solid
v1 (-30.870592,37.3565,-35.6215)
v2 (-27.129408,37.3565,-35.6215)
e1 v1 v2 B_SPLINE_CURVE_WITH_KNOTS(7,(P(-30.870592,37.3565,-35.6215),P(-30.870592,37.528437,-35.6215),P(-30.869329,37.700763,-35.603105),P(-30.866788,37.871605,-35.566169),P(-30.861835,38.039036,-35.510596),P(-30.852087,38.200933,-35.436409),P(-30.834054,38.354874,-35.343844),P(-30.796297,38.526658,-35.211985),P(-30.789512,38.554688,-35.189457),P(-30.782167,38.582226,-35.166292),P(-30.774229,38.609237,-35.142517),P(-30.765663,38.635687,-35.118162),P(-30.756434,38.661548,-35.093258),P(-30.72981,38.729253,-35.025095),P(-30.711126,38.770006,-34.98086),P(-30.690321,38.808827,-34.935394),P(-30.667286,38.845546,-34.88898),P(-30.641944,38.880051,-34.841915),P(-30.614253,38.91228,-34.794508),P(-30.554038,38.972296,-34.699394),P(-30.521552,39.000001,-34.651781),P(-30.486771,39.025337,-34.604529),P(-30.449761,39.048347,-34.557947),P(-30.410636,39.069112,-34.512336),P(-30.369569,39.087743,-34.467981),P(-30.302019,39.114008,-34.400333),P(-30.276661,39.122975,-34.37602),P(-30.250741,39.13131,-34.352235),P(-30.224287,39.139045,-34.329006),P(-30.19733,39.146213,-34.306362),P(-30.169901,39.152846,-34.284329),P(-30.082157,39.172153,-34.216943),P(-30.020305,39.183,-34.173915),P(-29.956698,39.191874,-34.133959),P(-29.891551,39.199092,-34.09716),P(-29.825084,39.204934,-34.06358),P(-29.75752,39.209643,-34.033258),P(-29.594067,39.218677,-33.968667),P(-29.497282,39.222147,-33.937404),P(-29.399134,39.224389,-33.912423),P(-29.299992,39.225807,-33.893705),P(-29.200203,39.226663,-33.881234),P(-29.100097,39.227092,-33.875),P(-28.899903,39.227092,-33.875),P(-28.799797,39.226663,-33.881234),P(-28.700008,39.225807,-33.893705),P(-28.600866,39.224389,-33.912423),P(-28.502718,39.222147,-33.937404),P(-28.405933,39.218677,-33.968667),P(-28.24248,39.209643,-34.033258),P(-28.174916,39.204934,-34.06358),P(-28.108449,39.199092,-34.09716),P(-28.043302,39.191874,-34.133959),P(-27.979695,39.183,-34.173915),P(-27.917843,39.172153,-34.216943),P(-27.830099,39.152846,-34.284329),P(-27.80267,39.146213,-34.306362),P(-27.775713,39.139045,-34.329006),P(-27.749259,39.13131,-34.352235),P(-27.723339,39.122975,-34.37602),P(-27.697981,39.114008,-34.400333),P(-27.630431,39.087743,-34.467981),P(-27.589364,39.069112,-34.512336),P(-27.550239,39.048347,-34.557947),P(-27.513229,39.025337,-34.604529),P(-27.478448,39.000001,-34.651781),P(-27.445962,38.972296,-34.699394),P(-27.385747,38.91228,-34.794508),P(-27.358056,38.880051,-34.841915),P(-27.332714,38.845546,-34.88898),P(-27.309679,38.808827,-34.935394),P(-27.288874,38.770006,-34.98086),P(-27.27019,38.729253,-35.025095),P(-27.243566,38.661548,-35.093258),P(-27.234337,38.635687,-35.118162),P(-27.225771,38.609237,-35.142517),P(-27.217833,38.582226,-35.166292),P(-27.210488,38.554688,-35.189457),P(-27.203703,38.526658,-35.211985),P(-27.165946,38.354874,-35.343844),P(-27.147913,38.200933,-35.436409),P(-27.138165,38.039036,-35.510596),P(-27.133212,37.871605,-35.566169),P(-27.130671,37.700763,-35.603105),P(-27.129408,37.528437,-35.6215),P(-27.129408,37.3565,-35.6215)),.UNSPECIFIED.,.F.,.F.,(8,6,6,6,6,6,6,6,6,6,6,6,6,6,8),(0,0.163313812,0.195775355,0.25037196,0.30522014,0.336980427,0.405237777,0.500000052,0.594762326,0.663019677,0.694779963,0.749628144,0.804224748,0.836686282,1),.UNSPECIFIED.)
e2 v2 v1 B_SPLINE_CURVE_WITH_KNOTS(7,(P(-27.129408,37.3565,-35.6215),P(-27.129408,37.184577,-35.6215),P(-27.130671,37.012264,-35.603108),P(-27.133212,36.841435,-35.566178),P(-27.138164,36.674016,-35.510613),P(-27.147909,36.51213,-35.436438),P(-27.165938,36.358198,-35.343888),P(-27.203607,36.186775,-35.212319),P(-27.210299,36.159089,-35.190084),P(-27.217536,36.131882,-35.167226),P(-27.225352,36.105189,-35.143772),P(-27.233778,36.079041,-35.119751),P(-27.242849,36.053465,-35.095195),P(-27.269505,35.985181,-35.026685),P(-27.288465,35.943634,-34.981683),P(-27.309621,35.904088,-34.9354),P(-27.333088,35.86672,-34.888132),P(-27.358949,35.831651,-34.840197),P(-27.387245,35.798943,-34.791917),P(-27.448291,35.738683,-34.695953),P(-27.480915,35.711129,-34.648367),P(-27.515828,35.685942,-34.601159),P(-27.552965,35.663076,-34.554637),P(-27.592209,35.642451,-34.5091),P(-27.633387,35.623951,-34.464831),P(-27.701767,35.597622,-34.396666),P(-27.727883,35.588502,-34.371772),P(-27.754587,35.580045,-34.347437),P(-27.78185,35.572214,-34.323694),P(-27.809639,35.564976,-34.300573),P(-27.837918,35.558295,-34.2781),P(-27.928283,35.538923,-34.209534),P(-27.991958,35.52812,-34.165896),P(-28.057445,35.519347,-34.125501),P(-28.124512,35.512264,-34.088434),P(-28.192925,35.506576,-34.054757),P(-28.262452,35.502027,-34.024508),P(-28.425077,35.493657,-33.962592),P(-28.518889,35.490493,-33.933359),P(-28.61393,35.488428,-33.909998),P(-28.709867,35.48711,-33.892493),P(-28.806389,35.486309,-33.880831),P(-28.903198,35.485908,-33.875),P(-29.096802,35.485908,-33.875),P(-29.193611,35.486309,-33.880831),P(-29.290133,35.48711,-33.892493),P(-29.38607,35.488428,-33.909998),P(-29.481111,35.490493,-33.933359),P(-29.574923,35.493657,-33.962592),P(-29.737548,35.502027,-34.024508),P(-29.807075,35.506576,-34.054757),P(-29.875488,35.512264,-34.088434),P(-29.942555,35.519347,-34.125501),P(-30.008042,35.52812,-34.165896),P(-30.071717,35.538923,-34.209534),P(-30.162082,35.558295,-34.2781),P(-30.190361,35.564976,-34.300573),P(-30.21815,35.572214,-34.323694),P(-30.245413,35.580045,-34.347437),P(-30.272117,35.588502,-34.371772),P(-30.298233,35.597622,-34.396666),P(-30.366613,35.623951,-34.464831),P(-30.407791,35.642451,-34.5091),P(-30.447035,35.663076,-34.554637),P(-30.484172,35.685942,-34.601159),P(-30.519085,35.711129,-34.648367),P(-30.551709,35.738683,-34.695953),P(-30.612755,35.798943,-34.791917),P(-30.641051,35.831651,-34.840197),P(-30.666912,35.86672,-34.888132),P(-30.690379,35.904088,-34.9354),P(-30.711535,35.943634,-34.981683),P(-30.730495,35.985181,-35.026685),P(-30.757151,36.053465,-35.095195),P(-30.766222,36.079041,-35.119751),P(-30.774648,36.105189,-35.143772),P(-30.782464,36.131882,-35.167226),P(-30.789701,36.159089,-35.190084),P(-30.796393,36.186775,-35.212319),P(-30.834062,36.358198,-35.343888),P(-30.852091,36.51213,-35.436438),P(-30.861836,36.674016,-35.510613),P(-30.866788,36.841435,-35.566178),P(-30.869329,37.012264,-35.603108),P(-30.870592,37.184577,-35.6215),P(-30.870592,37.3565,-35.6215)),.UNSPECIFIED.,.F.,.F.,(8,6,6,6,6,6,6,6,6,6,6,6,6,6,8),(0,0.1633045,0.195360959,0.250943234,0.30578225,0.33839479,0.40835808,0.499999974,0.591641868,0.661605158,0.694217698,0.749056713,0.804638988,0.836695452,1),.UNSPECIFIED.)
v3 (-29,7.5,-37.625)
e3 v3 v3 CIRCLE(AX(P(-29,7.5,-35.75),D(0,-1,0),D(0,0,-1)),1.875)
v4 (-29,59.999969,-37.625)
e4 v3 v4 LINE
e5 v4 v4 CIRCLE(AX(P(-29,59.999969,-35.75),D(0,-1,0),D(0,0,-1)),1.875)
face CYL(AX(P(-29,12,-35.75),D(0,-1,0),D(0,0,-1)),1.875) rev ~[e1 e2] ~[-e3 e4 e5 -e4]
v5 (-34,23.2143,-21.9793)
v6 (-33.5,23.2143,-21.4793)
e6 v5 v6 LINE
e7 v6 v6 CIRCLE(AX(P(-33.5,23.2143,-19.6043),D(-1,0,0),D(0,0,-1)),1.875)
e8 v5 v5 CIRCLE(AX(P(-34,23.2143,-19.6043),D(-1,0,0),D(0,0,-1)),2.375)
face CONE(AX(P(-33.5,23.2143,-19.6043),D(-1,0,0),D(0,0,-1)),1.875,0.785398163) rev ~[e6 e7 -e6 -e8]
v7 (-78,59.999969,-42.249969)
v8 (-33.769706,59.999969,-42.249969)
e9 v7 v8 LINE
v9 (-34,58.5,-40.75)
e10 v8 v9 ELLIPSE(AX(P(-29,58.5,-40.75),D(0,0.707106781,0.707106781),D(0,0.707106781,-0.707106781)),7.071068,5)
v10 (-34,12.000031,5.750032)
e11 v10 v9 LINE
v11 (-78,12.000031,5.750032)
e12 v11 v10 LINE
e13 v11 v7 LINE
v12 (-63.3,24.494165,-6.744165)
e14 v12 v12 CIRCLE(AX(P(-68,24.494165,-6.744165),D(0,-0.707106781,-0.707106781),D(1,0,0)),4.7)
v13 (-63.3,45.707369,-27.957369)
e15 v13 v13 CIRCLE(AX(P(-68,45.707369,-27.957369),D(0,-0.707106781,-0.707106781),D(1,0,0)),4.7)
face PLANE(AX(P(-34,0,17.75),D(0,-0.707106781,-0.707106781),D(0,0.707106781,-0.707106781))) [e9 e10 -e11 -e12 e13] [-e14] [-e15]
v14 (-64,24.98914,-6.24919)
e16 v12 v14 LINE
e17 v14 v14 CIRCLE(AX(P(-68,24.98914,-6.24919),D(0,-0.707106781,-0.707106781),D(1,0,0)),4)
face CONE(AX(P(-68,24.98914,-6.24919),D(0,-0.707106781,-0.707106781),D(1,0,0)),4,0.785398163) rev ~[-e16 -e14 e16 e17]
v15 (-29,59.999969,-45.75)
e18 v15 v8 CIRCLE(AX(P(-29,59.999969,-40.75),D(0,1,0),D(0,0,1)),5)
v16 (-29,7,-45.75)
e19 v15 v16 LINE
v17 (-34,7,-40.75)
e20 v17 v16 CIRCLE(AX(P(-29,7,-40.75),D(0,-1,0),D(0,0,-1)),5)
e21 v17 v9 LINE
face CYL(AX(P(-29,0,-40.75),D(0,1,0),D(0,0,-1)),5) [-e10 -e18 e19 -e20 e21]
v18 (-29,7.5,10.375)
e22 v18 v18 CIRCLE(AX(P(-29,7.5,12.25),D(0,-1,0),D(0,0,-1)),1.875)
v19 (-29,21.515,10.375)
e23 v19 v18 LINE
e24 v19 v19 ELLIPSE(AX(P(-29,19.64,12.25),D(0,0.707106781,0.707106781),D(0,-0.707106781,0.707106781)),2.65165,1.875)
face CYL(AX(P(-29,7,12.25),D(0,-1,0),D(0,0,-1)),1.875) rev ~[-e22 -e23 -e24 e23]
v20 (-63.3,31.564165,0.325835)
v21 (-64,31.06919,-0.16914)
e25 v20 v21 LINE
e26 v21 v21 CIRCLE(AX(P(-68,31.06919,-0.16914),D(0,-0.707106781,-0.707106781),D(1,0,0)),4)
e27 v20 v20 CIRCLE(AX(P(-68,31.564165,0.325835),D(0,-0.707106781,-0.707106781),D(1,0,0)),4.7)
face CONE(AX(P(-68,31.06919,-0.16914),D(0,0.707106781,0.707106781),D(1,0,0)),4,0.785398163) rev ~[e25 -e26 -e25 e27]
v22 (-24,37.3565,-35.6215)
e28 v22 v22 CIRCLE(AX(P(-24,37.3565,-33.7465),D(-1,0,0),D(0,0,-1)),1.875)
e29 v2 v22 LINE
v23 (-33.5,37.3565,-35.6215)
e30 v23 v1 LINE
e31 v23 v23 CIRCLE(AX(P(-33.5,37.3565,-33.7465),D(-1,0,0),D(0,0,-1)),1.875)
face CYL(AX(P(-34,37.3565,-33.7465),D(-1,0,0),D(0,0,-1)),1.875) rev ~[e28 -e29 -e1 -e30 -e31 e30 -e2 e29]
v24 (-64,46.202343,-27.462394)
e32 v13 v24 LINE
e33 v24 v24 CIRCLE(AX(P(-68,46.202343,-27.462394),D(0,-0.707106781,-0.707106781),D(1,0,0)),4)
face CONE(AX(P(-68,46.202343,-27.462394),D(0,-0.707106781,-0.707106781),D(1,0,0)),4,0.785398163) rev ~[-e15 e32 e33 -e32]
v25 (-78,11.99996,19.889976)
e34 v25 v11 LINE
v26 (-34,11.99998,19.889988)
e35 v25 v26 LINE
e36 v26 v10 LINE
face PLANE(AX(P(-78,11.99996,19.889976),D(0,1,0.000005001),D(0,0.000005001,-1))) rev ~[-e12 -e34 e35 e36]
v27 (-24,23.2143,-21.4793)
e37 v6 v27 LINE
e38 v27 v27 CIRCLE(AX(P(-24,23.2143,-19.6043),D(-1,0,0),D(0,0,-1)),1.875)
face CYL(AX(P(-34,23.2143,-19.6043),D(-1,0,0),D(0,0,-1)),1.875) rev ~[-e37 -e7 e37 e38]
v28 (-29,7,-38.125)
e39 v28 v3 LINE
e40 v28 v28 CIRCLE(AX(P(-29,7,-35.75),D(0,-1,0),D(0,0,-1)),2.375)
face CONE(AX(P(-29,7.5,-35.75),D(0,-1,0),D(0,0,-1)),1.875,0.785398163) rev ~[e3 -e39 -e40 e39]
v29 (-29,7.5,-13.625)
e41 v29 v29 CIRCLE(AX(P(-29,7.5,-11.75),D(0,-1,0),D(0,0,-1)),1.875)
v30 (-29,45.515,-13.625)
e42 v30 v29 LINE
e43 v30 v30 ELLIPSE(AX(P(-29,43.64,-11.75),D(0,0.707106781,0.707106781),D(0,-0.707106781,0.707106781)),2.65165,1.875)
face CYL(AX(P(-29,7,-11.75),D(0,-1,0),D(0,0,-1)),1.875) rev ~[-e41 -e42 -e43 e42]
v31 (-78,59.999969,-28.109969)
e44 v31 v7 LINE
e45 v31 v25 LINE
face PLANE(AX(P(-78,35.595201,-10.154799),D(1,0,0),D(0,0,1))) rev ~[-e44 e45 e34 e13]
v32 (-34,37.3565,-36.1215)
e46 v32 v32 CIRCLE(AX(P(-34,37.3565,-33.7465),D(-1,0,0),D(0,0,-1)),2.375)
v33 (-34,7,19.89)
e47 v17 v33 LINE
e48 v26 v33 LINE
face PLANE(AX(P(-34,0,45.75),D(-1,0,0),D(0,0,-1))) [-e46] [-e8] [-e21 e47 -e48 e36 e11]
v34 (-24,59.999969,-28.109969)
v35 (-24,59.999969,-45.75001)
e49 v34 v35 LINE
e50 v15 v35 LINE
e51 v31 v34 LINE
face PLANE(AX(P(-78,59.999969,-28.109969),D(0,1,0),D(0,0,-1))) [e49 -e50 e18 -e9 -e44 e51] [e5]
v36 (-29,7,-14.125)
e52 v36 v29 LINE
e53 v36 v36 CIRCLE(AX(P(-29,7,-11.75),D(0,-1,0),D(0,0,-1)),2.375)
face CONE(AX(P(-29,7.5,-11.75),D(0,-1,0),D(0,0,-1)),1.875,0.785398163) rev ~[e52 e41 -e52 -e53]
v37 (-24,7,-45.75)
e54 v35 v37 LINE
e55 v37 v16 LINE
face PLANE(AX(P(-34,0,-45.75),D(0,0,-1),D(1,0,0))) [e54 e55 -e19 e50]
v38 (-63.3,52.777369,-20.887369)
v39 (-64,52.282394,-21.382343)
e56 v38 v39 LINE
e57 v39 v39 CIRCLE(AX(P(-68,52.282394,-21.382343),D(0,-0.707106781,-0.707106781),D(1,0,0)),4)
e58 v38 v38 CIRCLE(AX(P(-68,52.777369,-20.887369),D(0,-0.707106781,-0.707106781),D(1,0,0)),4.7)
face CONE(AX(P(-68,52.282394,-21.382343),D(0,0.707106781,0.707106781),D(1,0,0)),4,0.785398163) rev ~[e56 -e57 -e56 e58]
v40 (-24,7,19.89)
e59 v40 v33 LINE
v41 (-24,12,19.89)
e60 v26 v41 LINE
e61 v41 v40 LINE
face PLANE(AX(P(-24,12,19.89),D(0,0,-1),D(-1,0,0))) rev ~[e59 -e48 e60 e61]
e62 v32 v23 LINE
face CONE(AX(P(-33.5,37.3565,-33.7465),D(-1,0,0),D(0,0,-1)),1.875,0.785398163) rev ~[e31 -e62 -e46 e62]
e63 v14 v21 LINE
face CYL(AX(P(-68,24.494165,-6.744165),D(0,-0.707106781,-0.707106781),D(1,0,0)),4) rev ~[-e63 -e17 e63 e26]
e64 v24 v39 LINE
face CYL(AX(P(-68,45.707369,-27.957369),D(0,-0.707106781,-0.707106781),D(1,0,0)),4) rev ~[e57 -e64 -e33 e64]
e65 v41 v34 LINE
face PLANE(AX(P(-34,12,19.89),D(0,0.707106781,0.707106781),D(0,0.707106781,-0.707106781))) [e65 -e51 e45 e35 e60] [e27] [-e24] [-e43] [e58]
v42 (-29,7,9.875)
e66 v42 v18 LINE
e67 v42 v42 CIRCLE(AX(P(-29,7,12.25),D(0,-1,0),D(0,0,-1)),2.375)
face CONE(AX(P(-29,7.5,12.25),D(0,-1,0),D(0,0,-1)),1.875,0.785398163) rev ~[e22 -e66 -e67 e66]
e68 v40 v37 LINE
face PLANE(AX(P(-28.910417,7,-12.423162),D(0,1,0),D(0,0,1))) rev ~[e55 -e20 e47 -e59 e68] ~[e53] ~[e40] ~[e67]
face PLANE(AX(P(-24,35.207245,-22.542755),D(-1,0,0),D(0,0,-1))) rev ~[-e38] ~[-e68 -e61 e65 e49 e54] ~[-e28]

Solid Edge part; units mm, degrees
sketch "Sketch1" plane through (0, 0, 0) normal (0, -1, 0) x (1, 0, 0)
  line L0 (-34, -45.75) -> (34, -45.75)
  line L1 (34, -45.75) -> (34, 45.75)
  line L2 (34, 45.75) -> (-34, 45.75)
  line L3 (-34, 45.75) -> (-34, -45.75)
  dimension "D1" = 68
  dimension "D2" = 91.5
extrude "Protrusion1" add sketch "Sketch1" against normal blind 12
sketch "Sketch2" plane through (0, 0, 0) normal (0, -1, 0) x (1, 0, 0)
  circle A0 centre (0, -14.75) radius 11.25
  circle A1 centre (-15.5, 0.75) radius 1.7
  circle A2 centre (-15.5, -30.25) radius 1.7
  circle A3 centre (15.5, -30.25) radius 1.7
  circle A4 centre (15.5, 0.75) radius 1.7
  dimension "D1" = 22.5
  dimension "D2" = 3.4
  dimension "D3" = 31
  dimension "D4" = 31
extrude "Cutout1" cut sketch "Sketch2" against normal through all
sketch "Sketch3" plane through (0, 0, 0) normal (0, -1, 0) x (1, 0, 0)
  circle A0 centre (7.7782, 36.0282) radius 1.4
  circle A1 centre (7.7782, 20.4718) radius 1.4
  circle A2 centre (-7.7782, 20.4718) radius 1.4
  circle A3 centre (-7.7782, 36.0282) radius 1.4
  circle A4 centre (0, 28.25) radius 6
  dimension "D1" = 7.7782
extrude "Cutout2" cut sketch "Sketch3" against normal through all
sketch "Sketch4" plane through (-34, 6, 0) normal (-1, 0, 0) x (0, 0, -1)
  line L0 (-19.89, -6) -> (45.75, -71.64)
  line L1 (45.75, -71.64) -> (45.75, -6)
  line L2 (45.75, -6) -> (-19.89, -6)
  dimension "D1" = 25.86
extrude "Extrusionsausprägung_2" add sketch "Sketch4" against normal blind 10
sketch "Sketch5" plane through (-34, 38.82, 0) normal (-1, 0, 0) x (0, 0, -1)
  circle A0 centre (33.7465, 1.4635) radius 1.875
  circle A1 centre (19.6043, 15.6057) radius 1.875
  dimension "D1" = 3.75
  dimension "D2" = 20
  dimension "D3" = 42.14
  dimension "D4" = 32.83
extrude "Extrusionsausschnitt_3" cut sketch "Sketch5" against normal blind 14
sketch "Sketch6" plane through (-34, 38.82, 0) normal (-1, 0, 0) x (0, 0, -1)
  line L0 (45.75, -38.82) -> (-31.89, 38.82)
  line L1 (-31.89, 38.82) -> (-17.75, 38.82)
  line L2 (-17.75, 38.82) -> (45.75, -24.68)
  line L3 (45.75, -24.68) -> (45.75, -38.82)
  dimension "D1" = 14.14
extrude "Extrusionsausprägung_4" add sketch "Sketch6" along normal blind 44
sketch "Sketch7" plane through (-54, 31.75, -14) normal (0, -0.7071068, -0.7071068) x (1, 0, 0)
  circle A0 centre (-14, 10.2613) radius 4
  circle A1 centre (-14, -19.7387) radius 4
  dimension "D1" = 8
  dimension "D2" = 34.64
  dimension "D3" = 30
  dimension "D4" = 10
extrude "Cutout3" cut sketch "Sketch7" against normal up to next
mirror "Mirror1" [suppressed]
sketch "Sketch8" plane through (-78, 38.82, -6.93) normal (-1, 0, 0) x (0, 0.7071068, -0.7071068)
  line L0 (29.953, 0) -> (42.4264, 12.4734)
  dimension "D1" = 60
extrude "Cutout4" cut sketch "Sketch8" against normal through all material side at (-78, 60.05, -36.93)
mirror "Mirror2" [suppressed]
fillet "Verrundung_1" radius 5 2 edges at (34, 6, -45.75) (-34, 30, -45.75)
chamfer "Fase_1" distance 0.5 angle 45 2 edges at (-34, 23.2143, -17.7293) (-34, 37.3565, -31.8715)
chamfer "Fase_2" distance 0.4 angle 45 4 edges at (-17.2, 0, -30.25) (-17.2, 0, 0.75) (13.8, 0, 0.75) (13.8, 0, -30.25)
chamfer "Fase_3" distance 0.4 angle 45 4 edges at (-9.1782, 0, 20.4718) (-9.1782, 0, 36.0282) (6.3782, 0, 36.0282) (6.3782, 0, 20.4718)
chamfer "Fase_4" distance 2.5 angle 45 2 edges at (-11.25, 0, -14.75) (0, 12, -3.5)
chamfer "Fase_5" distance 1.4 angle 45 2 edges at (-6, 0, 28.25) (0, 12, 34.25)
sketch "Sketch9" plane through (-78, 30, -5.18) normal (-1, 0, 0) x (0, 0.7071068, -0.7071068)
  line L0 (-30.4551, -4.9992) -> (-20.4566, 4.9992)
extrude "Extrusionsausschnitt_8" cut sketch "Sketch9" against normal blind 44 material side at (-78, 11.95, 12.82)
sketch "Sketch10" plane through (-78, 36, -11.18) normal (-1, 0, 0) x (0, 0.7071068, -0.7071068)
  line L0 (-57.2262, -23.285) -> (7.4741, 41.4152)
extrude "Cutout5" cut sketch "Sketch10" against normal through all material side at (-78, 11.95, 0)
sketch "Sketch11" plane through (-51, 12, -12.93) normal (0, -1, 0) x (0, 0, -1)
  circle A0 centre (22.82, 22) radius 1.875
  circle A1 centre (-1.18, 22) radius 1.875
  circle A2 centre (-25.18, 22) radius 1.875
  dimension "D1" = 3.75
  dimension "D2" = 24
  dimension "D3" = 24
  dimension "D4" = 10
extrude "Cutout6" cut sketch "Sketch11" against normal through all
sketch "Sketch12" plane through (-51, 12, -12.93) normal (0, -1, 0) x (0, 0, -1)
  line L0 (32.82, 27) -> (32.82, 22)
  line L1 (-32.82, 27) -> (32.82, 27)
  line L2 (-32.82, 27) -> (-32.82, 17)
  line L3 (-32.82, 17) -> (-18.68, 17)
  line L4 (-18.68, 17) -> (27.82, 17)
  arc A0 (27.82, 17) -> (32.82, 22) centre (27.82, 22) ccw
extrude "Extrusionsausprägung_6" add sketch "Sketch12" along normal blind 5
sketch "Sketch13" plane through (-29, 7, -12.93) normal (0, -1, 0) x (0, 0, -1)
  circle A0 centre (22.82, 0) radius 1.875
  circle A1 centre (-1.18, 0) radius 1.875
  circle A2 centre (-25.18, 0) radius 1.875
  dimension "D1" = 3.75
  dimension "D2" = 10
  dimension "D3" = 24
  dimension "D4" = 24
extrude "Cutout7" cut sketch "Sketch13" against normal through all
chamfer "Fase_9" distance 0.5 angle 45 3 edges at (-29, 7, -9.875) (-29, 7, 14.125) (-29, 7, -33.875)
chamfer "Fase_10" distance 0.7 angle 45 4 edges at (-72, 24.4942, -6.7442) (-72, 45.7074, -27.9574) (-68, 55.6058, -23.7158) (-68, 34.3926, -2.5026)
properties part number "A3.A1.A1.3" material "Nylon, allgemein"
